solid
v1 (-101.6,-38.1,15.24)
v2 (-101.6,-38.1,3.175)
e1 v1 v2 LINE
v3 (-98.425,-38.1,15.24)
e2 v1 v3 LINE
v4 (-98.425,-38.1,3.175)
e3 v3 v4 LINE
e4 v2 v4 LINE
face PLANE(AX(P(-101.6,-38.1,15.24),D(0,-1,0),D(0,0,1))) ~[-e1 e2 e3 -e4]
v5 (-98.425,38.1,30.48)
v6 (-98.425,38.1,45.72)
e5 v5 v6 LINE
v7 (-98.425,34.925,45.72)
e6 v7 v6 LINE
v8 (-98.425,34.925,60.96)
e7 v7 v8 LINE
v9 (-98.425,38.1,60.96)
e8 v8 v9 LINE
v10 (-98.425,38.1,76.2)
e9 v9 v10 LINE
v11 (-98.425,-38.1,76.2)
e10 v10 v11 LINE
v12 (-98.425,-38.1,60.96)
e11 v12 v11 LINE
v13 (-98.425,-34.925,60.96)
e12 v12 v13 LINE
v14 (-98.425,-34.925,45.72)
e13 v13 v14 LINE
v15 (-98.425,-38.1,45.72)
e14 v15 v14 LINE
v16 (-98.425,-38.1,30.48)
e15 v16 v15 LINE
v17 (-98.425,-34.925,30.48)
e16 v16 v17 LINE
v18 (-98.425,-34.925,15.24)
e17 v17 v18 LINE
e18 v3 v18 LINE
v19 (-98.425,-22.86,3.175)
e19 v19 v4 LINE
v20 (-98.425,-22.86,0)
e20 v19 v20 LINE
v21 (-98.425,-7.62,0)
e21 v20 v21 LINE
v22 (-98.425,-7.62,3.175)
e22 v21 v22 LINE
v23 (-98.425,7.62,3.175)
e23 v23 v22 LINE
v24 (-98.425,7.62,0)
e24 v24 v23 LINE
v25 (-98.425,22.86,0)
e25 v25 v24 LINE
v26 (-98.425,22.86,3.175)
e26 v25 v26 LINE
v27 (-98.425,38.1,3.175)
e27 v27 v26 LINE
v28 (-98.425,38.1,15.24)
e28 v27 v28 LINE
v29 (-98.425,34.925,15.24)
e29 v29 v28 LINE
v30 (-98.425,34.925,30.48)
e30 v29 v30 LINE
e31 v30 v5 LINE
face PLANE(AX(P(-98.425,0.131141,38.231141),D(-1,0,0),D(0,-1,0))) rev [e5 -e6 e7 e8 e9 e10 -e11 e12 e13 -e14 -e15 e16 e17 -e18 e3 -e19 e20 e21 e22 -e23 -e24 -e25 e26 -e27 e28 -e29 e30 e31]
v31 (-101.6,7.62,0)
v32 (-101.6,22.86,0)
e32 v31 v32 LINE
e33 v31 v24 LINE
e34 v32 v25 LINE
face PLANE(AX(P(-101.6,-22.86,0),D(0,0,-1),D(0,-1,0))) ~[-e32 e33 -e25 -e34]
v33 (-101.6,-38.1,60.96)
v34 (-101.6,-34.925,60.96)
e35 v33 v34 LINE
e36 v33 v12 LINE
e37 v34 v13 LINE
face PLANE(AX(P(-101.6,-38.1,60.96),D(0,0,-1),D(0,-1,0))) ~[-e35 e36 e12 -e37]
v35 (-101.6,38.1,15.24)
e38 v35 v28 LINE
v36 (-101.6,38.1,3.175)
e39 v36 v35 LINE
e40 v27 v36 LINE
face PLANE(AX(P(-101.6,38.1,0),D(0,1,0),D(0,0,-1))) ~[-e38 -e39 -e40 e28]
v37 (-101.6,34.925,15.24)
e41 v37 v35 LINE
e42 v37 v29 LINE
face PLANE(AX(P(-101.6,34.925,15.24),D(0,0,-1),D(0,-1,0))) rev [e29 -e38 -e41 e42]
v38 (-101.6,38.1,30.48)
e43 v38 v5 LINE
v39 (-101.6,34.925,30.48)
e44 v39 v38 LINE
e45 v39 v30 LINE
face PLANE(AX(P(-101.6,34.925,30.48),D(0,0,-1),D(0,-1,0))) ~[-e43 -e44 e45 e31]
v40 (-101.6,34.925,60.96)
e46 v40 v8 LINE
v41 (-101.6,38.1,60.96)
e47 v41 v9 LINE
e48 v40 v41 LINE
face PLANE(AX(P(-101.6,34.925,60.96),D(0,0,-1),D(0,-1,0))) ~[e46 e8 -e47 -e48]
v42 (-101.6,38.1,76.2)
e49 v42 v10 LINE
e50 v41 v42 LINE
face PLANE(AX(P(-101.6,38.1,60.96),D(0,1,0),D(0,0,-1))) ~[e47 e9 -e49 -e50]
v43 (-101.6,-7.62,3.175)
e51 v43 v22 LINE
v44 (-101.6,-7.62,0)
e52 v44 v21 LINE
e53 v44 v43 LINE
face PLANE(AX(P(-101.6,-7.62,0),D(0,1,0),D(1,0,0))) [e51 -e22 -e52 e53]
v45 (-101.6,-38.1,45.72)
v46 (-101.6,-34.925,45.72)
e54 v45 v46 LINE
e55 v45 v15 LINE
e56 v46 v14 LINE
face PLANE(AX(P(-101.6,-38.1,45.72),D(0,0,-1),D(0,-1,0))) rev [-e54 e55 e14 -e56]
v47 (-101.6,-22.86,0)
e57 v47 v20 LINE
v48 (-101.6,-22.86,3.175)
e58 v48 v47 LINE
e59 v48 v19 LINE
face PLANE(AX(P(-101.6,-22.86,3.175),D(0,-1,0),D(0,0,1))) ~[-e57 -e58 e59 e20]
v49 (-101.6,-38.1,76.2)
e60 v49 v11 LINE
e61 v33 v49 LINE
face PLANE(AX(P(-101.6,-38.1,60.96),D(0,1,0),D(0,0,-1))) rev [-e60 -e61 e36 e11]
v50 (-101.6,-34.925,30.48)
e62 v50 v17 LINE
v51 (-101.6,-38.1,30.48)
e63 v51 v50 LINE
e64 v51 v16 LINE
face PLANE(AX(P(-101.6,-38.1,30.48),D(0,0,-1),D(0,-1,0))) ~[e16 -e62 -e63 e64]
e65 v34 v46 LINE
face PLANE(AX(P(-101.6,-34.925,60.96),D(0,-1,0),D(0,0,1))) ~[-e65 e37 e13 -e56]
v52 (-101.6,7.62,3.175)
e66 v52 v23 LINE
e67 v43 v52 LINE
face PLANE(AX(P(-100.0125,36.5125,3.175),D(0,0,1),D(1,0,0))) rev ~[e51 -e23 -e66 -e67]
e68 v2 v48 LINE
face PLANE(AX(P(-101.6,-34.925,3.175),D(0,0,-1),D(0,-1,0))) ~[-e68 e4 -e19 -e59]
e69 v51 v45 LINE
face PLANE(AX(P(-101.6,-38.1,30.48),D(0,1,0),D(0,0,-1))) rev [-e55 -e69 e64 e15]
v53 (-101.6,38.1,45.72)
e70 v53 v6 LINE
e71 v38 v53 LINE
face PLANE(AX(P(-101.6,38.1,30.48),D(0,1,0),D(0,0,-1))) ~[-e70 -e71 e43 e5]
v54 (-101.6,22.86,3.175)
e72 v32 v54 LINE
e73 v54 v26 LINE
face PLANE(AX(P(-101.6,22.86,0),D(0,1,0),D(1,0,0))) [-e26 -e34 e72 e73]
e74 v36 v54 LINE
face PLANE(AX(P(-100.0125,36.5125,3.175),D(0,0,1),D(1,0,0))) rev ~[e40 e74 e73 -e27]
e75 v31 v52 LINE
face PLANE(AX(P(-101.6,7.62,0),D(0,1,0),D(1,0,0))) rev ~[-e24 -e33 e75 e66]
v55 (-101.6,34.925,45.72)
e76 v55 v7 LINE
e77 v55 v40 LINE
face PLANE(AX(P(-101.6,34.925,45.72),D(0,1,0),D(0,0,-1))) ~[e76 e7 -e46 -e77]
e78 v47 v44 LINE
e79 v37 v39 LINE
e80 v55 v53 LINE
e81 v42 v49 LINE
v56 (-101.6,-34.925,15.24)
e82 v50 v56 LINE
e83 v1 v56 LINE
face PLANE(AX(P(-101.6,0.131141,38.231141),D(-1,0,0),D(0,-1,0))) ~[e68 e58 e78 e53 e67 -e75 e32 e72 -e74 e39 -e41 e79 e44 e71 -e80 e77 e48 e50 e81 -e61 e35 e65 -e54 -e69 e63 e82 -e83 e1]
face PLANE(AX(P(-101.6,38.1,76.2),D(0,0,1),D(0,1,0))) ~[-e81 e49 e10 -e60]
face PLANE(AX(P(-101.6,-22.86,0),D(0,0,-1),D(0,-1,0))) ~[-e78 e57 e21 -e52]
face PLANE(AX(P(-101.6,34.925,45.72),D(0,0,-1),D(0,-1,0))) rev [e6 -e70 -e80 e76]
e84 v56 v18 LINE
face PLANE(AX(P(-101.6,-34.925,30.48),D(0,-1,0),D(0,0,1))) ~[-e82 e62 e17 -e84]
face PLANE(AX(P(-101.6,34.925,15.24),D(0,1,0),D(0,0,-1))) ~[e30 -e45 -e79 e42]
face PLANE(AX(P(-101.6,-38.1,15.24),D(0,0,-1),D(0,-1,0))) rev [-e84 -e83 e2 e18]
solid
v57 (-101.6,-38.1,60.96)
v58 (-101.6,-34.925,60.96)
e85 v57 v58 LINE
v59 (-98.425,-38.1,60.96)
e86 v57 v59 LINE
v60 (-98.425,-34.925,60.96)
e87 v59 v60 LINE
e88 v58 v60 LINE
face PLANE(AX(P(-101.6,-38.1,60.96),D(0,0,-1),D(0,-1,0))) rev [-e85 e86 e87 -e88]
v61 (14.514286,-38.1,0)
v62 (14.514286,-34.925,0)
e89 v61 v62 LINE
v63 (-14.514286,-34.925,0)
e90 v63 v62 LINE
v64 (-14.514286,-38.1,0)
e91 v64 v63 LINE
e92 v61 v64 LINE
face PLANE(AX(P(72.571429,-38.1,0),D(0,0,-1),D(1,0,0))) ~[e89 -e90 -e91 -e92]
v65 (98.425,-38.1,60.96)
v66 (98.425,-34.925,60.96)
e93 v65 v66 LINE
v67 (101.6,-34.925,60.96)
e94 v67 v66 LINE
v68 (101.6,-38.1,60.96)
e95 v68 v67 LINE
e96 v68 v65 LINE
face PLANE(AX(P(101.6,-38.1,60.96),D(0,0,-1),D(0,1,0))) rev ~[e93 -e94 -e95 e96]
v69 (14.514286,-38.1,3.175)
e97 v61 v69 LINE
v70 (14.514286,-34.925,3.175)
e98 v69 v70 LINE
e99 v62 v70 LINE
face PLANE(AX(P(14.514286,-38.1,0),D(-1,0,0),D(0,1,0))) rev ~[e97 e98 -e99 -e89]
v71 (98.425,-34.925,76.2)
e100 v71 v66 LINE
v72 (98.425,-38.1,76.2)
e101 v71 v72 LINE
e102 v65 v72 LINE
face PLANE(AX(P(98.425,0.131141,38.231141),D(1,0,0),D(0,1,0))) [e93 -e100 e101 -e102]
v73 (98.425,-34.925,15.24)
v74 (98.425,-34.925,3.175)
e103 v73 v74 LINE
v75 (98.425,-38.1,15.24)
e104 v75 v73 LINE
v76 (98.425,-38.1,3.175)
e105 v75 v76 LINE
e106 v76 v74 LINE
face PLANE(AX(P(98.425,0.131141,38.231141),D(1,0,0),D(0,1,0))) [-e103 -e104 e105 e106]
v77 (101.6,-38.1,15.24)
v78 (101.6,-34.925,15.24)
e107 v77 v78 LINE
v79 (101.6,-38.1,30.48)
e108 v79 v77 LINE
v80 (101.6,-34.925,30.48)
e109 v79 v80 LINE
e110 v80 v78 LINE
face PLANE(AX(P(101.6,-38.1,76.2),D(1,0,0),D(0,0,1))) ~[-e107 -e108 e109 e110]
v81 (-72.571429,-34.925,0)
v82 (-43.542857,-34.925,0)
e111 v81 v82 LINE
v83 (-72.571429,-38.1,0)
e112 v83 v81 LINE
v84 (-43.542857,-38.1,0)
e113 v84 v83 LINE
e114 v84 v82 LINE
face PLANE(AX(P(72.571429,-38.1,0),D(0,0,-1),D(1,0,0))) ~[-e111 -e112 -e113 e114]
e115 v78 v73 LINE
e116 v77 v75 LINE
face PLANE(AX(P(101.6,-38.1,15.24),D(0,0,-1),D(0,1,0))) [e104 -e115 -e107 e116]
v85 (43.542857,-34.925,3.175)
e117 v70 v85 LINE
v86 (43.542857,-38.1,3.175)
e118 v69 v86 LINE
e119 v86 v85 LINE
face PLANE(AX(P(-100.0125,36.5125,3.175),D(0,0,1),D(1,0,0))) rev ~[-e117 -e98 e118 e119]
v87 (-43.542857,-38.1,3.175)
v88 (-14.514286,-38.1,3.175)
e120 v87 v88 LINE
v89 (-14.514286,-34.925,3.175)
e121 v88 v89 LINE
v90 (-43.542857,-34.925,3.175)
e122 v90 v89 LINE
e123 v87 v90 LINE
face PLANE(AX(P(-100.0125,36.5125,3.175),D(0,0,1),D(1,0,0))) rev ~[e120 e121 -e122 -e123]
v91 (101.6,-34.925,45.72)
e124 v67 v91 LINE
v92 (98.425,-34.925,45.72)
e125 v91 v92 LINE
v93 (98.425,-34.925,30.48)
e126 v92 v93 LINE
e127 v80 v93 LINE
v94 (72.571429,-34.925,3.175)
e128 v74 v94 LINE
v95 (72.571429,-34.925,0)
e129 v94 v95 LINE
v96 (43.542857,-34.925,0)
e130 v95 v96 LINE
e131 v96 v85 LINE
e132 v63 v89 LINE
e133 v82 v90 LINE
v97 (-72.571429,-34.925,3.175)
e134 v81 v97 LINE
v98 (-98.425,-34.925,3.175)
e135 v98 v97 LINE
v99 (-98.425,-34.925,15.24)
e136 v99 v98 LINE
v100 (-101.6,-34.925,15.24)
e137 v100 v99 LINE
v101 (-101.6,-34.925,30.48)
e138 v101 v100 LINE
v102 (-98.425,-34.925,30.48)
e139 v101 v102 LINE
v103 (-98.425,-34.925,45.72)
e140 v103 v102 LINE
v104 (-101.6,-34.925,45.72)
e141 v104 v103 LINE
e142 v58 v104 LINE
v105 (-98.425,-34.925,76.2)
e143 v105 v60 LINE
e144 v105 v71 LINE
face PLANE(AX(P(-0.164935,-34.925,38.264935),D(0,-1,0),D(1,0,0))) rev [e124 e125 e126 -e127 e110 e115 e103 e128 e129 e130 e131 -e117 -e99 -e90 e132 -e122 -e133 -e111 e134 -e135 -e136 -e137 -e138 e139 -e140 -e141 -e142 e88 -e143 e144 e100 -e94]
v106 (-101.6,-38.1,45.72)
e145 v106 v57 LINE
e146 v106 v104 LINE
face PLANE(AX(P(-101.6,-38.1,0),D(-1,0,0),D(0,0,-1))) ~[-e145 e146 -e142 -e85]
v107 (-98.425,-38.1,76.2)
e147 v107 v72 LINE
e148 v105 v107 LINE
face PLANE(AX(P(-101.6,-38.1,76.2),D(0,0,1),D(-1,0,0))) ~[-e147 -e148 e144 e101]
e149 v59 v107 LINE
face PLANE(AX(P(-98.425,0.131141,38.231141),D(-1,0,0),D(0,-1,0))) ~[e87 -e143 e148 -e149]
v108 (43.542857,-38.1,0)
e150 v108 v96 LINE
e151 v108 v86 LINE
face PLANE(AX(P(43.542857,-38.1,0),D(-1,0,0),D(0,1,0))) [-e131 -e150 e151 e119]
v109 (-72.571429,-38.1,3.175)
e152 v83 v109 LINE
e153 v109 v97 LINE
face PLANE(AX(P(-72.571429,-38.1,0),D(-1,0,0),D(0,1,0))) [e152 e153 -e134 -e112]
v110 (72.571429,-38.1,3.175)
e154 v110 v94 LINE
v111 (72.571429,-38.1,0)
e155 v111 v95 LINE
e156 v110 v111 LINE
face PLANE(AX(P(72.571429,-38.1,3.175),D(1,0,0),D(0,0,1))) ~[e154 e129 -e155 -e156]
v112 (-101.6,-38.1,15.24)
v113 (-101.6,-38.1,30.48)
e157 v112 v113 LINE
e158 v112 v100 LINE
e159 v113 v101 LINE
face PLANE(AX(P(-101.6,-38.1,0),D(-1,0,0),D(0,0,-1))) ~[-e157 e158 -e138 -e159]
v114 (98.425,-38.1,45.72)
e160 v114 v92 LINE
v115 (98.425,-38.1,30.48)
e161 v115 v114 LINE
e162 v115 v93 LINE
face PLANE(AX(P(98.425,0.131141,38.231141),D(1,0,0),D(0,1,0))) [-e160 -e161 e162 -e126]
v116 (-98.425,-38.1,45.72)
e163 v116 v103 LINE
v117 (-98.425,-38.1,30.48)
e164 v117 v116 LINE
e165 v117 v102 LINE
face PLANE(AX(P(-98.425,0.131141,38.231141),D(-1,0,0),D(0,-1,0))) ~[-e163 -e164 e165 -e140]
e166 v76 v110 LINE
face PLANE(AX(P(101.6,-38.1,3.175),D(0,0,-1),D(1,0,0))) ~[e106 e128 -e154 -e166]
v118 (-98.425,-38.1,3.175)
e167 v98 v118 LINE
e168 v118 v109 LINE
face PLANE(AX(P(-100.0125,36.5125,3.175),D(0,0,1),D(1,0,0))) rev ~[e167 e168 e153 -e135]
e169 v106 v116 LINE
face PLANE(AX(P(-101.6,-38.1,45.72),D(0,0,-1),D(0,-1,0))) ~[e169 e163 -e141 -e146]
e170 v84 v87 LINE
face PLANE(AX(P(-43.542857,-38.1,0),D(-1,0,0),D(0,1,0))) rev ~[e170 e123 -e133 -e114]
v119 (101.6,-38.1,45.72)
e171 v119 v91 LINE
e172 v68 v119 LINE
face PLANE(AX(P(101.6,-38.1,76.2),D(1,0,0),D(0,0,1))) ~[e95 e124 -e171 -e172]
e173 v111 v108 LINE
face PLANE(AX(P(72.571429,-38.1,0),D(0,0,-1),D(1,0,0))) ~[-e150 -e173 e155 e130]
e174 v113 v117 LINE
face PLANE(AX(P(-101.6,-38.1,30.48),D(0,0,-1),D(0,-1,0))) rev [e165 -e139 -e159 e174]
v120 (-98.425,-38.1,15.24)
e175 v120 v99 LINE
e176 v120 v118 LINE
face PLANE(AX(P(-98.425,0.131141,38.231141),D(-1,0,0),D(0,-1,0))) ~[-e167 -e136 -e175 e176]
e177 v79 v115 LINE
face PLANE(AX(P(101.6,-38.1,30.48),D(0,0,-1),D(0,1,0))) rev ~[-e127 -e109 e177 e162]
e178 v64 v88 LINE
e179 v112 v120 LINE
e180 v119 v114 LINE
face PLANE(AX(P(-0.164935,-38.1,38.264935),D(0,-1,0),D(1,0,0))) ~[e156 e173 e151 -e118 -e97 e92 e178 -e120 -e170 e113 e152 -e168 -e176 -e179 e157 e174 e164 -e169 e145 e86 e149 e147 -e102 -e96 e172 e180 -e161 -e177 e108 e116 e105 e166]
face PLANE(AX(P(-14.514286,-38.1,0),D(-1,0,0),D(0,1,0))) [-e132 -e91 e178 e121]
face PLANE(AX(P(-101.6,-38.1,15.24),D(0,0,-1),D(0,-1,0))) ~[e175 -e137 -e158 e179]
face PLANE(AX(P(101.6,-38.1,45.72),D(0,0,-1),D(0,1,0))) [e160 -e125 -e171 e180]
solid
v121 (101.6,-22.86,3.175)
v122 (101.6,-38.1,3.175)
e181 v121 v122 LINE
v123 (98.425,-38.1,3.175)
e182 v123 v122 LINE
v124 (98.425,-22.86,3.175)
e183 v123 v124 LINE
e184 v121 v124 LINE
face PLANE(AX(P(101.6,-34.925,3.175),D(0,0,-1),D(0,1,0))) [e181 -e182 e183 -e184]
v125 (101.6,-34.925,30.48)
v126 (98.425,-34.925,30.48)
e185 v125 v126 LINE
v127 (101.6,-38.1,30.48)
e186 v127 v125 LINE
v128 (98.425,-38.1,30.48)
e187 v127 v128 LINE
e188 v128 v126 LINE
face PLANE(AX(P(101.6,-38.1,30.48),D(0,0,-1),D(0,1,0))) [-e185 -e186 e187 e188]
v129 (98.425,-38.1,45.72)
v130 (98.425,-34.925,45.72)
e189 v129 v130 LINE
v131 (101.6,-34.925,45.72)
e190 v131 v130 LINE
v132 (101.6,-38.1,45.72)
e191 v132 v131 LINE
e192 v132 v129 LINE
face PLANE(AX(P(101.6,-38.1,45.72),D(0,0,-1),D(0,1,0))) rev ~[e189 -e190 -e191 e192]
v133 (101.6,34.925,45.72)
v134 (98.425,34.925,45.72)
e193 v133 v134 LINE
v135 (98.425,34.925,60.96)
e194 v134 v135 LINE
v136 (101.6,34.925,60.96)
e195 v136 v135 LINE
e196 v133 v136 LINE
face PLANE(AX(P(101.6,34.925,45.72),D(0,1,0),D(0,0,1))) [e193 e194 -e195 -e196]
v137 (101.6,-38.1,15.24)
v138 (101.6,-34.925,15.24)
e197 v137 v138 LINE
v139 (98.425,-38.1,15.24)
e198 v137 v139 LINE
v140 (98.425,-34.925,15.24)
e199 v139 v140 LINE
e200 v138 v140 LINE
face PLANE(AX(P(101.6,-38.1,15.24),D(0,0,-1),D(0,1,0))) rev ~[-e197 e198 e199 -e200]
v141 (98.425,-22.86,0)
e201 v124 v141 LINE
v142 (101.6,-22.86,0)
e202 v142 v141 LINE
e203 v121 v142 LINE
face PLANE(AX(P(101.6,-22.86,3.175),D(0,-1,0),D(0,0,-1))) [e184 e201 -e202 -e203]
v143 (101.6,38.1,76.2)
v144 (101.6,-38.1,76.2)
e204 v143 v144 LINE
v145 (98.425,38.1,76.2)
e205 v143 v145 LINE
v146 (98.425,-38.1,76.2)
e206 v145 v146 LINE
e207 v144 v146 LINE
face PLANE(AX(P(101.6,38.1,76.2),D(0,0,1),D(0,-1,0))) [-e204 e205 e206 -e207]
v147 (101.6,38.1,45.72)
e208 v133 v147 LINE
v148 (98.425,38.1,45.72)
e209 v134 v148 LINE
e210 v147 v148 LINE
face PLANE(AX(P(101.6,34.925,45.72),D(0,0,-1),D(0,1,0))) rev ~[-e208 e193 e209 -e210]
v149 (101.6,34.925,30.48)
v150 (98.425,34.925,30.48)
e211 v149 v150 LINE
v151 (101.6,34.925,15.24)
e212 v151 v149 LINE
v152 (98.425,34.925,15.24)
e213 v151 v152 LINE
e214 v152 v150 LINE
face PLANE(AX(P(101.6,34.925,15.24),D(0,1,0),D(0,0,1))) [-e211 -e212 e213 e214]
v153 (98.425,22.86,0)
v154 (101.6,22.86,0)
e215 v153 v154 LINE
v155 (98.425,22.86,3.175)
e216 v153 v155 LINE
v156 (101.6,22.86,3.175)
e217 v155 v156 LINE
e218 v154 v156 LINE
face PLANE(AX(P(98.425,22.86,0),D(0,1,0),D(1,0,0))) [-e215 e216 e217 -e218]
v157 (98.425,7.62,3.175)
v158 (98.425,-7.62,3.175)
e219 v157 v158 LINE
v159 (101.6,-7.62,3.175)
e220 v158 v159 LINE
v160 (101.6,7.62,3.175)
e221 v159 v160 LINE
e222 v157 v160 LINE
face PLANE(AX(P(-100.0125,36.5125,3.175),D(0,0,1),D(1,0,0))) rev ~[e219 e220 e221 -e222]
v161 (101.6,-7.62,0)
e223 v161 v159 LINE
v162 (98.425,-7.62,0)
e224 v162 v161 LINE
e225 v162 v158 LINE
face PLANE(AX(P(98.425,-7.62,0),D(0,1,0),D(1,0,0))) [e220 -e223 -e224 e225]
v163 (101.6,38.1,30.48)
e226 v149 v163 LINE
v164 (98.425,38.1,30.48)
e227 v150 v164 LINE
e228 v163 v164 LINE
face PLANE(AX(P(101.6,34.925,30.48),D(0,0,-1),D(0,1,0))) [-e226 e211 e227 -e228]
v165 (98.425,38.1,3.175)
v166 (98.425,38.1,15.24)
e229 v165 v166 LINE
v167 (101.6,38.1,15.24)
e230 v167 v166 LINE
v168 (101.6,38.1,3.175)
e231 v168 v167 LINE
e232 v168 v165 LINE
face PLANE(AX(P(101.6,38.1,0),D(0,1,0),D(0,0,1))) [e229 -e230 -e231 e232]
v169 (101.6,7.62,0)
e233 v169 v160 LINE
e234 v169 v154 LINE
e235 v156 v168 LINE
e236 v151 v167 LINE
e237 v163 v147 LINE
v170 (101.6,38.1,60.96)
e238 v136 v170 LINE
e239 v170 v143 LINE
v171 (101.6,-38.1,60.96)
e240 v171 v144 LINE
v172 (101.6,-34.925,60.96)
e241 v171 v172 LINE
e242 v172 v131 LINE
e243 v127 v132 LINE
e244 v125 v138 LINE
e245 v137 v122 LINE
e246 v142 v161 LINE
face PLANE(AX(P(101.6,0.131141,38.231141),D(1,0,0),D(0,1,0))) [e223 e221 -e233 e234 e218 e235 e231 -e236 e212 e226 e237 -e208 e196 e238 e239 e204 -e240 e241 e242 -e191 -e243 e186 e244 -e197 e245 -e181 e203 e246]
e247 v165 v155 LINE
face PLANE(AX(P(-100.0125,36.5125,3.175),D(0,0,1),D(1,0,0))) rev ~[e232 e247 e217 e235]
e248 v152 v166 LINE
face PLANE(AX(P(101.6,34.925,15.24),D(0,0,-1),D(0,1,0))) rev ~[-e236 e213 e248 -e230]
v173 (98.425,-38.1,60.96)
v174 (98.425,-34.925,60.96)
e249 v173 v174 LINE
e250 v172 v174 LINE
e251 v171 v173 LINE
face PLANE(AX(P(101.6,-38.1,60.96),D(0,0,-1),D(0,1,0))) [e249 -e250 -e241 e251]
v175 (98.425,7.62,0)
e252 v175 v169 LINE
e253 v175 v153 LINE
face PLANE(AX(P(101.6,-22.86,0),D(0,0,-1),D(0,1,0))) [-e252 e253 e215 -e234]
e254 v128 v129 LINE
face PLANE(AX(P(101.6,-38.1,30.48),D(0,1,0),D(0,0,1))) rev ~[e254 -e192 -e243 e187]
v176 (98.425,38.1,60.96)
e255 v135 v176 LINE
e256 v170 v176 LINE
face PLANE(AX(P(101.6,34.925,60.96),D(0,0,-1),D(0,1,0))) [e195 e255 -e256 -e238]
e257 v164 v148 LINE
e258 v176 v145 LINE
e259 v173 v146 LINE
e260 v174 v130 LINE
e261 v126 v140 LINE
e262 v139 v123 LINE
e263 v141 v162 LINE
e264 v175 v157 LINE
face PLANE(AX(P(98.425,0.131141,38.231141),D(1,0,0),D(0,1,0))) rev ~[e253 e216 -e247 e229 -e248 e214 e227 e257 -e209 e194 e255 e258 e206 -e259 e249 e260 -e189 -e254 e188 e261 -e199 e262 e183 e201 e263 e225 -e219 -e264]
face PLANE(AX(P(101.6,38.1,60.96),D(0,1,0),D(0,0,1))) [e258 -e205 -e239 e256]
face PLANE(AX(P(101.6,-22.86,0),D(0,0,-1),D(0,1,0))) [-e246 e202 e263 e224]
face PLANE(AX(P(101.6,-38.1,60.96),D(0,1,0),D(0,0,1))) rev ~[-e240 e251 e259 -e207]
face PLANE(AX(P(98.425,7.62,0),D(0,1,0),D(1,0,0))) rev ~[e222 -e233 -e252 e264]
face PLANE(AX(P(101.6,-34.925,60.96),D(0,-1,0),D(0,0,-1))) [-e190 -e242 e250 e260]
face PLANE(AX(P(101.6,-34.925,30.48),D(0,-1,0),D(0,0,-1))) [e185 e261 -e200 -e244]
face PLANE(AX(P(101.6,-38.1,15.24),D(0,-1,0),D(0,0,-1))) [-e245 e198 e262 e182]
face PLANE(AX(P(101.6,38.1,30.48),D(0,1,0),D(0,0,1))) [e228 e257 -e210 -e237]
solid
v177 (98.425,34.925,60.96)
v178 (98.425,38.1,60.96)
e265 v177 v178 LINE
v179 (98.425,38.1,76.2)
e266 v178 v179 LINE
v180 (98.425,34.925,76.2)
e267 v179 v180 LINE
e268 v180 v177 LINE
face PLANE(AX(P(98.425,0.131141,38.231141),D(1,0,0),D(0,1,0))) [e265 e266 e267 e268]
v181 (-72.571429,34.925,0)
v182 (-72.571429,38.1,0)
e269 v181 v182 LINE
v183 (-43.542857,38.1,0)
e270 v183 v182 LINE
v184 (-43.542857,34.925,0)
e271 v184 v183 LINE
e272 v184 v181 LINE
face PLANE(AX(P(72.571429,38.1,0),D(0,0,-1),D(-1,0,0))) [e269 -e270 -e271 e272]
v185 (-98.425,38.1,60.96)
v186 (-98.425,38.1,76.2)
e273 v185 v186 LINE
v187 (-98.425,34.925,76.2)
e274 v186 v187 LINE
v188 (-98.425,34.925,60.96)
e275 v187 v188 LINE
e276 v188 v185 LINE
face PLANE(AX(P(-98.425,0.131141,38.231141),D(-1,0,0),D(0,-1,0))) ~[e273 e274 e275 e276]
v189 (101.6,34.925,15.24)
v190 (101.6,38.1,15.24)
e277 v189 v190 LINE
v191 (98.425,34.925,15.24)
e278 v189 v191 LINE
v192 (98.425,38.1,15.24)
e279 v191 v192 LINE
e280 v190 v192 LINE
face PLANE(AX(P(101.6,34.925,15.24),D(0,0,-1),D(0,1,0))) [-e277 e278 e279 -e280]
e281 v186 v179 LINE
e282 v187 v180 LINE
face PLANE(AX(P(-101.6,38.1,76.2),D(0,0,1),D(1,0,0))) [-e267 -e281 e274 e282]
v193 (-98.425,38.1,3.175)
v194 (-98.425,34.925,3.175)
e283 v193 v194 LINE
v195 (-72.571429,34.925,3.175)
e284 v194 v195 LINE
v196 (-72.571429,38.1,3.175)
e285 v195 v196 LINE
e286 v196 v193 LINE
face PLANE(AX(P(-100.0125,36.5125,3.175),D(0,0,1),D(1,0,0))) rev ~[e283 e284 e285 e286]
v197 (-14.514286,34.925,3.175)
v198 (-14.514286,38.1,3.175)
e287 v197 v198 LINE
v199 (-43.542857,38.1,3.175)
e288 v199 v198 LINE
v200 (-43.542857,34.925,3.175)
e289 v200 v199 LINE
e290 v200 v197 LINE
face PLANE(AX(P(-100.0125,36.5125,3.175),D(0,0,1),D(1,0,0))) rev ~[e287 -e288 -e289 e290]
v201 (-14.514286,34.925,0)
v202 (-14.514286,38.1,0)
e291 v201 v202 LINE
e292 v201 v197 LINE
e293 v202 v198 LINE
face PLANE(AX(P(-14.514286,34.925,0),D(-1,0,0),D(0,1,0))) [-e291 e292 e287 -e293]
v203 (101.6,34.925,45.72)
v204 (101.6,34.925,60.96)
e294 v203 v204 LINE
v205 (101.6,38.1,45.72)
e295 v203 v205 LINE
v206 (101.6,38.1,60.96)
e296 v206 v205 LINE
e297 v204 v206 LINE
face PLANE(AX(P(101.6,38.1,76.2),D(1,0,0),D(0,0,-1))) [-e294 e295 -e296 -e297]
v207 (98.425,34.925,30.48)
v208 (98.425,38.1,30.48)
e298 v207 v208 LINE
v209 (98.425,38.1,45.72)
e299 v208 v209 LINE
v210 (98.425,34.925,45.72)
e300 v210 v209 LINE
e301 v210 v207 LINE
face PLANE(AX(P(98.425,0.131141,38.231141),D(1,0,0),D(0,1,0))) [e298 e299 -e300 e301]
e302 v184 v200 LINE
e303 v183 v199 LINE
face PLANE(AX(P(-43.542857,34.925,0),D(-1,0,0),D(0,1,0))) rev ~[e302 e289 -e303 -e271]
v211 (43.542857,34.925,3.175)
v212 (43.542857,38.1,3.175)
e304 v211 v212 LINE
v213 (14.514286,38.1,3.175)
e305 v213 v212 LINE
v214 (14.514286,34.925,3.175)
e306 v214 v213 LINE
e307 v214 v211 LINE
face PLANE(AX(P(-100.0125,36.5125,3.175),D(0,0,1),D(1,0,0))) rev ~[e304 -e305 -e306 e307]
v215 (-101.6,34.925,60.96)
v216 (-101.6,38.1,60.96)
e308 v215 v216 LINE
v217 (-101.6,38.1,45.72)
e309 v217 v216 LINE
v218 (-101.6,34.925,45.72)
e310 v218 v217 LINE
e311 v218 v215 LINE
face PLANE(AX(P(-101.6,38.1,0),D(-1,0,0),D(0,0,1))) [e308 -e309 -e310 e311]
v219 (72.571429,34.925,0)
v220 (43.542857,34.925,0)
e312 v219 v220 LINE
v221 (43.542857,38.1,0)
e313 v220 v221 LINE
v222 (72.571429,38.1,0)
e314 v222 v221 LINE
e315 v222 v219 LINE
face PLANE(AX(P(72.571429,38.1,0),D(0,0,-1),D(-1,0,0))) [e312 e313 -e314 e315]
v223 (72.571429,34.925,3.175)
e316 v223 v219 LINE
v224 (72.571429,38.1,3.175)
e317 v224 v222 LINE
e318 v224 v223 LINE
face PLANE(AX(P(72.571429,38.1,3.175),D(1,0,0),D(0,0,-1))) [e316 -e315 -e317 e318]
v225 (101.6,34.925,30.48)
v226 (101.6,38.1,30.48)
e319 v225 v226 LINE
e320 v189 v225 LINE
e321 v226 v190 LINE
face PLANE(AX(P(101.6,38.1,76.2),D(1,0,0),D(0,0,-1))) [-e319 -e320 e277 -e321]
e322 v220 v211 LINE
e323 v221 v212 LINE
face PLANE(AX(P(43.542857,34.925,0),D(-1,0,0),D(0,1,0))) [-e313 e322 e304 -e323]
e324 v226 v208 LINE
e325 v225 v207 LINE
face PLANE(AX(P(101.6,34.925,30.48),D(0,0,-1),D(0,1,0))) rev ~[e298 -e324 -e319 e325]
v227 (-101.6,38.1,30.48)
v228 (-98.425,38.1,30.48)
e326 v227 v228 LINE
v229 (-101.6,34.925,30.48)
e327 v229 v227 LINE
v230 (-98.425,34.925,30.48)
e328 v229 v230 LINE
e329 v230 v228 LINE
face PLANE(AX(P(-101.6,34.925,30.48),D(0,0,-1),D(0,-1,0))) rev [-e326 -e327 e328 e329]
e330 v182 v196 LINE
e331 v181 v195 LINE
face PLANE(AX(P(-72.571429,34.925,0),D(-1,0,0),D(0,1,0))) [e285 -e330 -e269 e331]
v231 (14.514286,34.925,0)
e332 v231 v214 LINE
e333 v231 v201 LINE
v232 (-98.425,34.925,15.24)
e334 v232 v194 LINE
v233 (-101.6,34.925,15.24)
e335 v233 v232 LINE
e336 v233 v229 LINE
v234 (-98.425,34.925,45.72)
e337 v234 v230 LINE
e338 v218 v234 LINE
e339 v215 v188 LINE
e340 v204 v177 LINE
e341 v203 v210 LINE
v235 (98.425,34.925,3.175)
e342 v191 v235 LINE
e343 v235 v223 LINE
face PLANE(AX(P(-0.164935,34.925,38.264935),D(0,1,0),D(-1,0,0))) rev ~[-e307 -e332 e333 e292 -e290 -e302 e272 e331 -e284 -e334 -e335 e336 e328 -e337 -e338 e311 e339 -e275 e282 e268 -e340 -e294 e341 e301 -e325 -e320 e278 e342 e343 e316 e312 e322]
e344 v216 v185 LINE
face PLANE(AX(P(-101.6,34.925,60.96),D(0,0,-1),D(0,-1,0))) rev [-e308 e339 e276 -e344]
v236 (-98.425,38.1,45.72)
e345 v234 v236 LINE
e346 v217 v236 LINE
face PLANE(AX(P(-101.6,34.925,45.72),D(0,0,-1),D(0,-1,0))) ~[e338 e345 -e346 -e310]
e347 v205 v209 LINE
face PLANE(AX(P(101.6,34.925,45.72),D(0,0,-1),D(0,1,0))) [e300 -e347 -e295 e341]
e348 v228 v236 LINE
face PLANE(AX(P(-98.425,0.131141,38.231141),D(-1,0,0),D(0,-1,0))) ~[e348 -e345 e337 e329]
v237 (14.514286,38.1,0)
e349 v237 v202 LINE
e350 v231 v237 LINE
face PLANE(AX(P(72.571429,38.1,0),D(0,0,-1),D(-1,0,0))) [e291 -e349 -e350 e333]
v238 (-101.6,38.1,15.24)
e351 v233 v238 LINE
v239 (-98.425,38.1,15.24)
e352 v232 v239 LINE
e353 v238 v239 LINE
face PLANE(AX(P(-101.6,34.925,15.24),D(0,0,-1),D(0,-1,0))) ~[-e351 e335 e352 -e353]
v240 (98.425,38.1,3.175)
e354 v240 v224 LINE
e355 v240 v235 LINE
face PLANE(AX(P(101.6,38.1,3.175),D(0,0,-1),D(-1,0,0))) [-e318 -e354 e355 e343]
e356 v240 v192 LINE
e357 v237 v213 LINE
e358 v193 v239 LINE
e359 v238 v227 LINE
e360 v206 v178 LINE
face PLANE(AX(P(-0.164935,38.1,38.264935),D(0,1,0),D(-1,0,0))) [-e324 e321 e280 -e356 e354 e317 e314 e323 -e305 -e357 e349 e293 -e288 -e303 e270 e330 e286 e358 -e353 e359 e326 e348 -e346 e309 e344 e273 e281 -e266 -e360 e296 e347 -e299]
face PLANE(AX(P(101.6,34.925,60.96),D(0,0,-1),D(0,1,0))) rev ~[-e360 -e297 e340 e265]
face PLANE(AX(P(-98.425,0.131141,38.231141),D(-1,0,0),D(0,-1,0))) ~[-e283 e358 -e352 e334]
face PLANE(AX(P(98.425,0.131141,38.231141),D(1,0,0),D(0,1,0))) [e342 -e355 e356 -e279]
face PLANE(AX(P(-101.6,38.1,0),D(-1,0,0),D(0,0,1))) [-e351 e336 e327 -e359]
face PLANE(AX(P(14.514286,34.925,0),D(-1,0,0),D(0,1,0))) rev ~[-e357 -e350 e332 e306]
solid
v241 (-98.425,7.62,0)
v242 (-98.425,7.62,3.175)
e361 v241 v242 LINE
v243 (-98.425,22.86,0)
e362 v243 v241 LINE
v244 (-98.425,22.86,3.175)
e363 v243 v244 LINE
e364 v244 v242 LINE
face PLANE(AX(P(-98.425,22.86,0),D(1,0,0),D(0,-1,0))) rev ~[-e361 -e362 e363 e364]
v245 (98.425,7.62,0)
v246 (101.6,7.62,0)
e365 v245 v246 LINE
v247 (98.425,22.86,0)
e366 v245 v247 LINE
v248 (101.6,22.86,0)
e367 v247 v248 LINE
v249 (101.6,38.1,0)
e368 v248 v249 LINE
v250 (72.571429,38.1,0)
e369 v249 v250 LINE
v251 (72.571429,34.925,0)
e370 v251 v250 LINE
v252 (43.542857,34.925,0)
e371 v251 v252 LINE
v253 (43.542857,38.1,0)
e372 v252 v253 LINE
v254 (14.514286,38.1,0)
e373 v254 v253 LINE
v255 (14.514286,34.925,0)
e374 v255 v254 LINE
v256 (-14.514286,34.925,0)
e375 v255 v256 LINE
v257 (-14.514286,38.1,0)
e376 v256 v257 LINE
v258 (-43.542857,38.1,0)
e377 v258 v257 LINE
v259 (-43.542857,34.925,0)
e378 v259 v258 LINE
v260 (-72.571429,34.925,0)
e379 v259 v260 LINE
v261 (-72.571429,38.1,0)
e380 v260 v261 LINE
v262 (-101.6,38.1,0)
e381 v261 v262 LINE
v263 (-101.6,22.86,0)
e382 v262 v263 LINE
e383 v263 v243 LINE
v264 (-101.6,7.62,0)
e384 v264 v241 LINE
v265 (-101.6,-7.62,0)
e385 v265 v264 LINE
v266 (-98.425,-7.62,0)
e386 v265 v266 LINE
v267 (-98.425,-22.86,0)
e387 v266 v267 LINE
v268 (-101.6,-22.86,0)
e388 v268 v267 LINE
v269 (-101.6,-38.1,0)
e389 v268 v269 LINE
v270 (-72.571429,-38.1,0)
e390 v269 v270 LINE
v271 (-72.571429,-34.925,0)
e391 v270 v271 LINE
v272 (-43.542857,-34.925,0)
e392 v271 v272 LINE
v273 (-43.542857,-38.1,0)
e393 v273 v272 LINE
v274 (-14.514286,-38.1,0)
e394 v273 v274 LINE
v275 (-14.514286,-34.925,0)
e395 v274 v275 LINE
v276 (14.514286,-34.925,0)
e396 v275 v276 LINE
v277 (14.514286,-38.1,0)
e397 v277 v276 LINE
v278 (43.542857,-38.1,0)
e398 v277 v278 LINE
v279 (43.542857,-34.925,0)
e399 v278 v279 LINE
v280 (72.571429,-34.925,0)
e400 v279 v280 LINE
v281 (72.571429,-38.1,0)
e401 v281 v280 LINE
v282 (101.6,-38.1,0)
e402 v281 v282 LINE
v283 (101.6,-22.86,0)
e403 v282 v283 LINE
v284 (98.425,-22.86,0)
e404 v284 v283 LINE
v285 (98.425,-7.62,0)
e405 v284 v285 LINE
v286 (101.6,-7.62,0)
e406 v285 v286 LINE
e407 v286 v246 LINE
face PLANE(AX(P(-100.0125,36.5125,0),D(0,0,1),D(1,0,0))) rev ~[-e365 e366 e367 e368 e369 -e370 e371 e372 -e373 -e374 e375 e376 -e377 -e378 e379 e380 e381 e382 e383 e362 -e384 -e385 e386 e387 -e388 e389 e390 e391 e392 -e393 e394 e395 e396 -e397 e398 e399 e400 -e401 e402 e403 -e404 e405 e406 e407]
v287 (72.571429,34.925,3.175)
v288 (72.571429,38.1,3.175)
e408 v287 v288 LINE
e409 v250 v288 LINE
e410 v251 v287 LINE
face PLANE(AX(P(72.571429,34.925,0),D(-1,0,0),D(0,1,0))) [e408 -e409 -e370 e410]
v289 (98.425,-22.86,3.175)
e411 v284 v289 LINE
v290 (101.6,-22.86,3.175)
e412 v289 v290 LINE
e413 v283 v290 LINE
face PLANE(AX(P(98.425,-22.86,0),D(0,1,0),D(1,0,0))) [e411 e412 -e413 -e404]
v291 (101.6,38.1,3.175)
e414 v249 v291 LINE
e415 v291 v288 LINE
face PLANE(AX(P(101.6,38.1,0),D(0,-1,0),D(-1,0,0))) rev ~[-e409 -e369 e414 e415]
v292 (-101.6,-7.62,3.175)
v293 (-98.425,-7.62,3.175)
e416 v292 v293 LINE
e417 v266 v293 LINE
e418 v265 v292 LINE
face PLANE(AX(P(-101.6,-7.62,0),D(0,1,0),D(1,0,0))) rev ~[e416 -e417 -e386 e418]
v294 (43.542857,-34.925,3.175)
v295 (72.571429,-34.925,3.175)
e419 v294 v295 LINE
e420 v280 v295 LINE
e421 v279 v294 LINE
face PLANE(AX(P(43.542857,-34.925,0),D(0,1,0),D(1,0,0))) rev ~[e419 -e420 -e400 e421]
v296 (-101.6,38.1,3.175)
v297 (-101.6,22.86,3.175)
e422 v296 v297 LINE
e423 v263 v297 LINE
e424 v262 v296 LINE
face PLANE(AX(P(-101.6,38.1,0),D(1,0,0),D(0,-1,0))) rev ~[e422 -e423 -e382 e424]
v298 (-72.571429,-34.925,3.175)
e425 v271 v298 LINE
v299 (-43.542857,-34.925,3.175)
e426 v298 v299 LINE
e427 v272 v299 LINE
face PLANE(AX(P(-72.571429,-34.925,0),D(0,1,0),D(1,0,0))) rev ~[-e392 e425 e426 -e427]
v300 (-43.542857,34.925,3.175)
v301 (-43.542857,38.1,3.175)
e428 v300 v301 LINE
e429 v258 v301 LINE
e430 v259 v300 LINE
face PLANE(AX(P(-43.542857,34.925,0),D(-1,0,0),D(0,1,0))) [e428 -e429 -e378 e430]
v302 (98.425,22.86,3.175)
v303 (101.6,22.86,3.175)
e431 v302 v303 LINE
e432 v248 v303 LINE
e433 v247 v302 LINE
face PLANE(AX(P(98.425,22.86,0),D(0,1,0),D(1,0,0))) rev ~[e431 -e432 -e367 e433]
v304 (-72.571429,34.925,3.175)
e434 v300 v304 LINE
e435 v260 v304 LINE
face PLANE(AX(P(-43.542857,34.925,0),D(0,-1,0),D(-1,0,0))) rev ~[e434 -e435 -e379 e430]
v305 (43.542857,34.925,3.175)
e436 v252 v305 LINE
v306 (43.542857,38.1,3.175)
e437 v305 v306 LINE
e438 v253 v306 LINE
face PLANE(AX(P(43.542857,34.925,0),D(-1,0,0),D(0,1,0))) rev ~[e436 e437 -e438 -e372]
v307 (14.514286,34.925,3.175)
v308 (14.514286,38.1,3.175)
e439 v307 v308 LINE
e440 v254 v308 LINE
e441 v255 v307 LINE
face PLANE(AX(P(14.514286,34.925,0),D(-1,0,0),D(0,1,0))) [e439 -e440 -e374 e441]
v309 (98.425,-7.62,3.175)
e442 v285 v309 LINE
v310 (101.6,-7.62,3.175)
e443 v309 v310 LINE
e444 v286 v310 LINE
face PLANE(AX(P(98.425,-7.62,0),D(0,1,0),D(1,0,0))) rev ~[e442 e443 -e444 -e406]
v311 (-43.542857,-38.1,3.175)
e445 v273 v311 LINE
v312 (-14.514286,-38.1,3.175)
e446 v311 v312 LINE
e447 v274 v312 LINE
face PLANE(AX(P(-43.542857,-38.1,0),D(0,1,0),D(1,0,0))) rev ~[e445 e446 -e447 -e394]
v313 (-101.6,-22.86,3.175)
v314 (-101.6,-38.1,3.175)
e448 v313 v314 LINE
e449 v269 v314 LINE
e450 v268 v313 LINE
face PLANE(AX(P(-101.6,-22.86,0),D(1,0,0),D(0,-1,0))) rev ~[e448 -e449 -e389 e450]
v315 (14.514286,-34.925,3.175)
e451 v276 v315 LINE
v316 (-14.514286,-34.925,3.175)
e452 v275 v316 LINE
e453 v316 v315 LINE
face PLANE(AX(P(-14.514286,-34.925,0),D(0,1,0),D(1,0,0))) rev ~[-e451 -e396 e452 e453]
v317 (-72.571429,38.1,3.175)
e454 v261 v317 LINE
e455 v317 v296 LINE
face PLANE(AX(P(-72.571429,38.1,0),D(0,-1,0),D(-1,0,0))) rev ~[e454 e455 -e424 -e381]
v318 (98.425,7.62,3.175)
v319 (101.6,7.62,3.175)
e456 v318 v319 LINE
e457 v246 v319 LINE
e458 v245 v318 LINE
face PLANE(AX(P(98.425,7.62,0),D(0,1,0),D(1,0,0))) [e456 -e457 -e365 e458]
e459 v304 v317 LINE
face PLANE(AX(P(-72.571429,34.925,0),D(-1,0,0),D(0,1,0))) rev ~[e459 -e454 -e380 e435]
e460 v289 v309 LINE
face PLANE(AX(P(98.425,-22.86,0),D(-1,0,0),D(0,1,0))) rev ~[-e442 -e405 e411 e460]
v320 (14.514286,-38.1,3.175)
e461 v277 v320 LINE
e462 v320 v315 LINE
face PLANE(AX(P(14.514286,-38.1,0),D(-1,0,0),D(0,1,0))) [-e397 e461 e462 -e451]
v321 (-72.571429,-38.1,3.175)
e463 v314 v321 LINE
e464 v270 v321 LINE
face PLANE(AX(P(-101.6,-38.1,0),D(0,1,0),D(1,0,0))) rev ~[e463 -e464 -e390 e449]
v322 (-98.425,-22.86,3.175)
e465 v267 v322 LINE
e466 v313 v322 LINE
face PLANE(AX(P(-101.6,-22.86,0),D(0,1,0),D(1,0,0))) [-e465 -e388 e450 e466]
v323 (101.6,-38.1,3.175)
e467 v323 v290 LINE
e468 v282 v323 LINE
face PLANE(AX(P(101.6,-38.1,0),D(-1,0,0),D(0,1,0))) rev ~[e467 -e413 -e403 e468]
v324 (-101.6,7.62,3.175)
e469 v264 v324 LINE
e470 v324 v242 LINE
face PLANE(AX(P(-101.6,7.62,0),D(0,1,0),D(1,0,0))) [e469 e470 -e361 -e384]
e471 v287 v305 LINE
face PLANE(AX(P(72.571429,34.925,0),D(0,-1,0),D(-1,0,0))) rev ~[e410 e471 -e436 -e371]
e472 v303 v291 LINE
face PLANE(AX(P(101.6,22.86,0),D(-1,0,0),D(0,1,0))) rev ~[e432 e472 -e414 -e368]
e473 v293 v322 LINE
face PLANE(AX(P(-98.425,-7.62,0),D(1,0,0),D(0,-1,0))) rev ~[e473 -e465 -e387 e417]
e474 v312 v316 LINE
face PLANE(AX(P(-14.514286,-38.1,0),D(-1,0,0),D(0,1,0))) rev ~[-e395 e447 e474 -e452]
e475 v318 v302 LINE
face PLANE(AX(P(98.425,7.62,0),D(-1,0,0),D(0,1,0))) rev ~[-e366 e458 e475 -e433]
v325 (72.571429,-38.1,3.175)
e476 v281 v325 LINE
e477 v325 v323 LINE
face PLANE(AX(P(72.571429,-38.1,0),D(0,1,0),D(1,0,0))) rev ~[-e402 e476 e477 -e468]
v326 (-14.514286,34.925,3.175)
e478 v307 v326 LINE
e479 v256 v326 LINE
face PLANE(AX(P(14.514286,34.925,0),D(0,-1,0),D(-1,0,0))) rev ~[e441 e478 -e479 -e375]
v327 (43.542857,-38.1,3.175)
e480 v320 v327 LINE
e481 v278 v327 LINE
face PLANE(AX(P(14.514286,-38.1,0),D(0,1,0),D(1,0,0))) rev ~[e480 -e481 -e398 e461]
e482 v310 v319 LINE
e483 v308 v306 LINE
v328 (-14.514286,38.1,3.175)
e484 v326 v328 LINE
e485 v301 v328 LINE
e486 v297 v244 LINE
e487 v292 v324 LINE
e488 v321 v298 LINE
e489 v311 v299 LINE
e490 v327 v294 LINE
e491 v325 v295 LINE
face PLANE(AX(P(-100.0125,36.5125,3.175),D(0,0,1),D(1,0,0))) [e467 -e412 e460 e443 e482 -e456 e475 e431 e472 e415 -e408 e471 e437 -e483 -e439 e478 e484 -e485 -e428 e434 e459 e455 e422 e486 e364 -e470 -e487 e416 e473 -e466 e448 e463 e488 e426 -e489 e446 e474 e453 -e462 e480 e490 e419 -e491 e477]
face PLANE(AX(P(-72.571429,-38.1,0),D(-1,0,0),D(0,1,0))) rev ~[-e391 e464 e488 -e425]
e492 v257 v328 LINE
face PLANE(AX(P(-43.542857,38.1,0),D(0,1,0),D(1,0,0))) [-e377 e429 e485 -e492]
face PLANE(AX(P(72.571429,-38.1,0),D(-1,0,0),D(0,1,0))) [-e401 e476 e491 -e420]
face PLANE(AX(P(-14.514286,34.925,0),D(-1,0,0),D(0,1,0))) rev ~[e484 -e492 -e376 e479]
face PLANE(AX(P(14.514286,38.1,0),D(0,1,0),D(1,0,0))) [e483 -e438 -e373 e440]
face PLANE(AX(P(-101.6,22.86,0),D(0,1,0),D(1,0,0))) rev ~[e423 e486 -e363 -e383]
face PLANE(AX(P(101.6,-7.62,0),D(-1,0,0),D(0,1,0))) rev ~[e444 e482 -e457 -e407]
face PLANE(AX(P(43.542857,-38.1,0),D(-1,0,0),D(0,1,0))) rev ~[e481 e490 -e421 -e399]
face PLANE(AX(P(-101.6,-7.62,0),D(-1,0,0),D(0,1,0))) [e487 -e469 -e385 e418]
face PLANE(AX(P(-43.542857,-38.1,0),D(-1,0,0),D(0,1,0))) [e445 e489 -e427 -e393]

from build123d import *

# Parameters (mm, degrees)
F0_W     = 3.175
F0_H     = 3.175
F0_H_2   = 12.065
F0_W_2   = 25.8535714286
F0_H_3   = 15.24
F0_W_3   = 29.0285714286
F1_DEPTH = 3.175
F2_W     = 3.175
F2_H     = 15.24
F2_H_2   = 12.065
F2_H_3   = 3.175
F3_DEPTH = 3.175
F7_DEPTH = 3.175


with BuildPart() as f1:
    # F0 (on Top) → F1 (new body)
    with BuildSketch(Plane.XY):
        with Locations((-100.0125, 36.5125)):
            Rectangle(F0_W, F0_H)
        with Locations((-100.0125, 28.8925)):
            Rectangle(F0_W, F0_H_2)
        with Locations((-85.4982142857, 36.5125)):
            Rectangle(F0_W_2, F0_H)
        Polygon((98.425, 22.86), (98.425, 34.925), (72.5714285714, 34.925), (43.5428571429, 34.925), (14.5142857143, 34.925), (-14.5142857143, 34.925), (-43.5428571429, 34.925), (-72.5714285714, 34.925), (-98.425, 34.925), (-98.425, 22.86), (-98.425, 7.62), (-98.425, -7.62), (-98.425, -22.86), (-98.425, -34.925), (-72.5714285714, -34.925), (-43.5428571429, -34.925), (-14.5142857143, -34.925), (14.5142857143, -34.925), (43.5428571429, -34.925), (72.5714285714, -34.925), (98.425, -34.925), (98.425, -22.86), (98.425, -7.62), (98.425, 7.62), align=None)
        with Locations((-100.0125, 0)):
            Rectangle(F0_W, F0_H_3)
        with Locations((-100.0125, -28.8925)):
            Rectangle(F0_W, F0_H_2)
        with Locations((-100.0125, -36.5125)):
            Rectangle(F0_W, F0_H)
        with Locations((-85.4982142857, -36.5125)):
            Rectangle(F0_W_2, F0_H)
        with Locations((-29.0285714286, -36.5125)):
            Rectangle(F0_W_3, F0_H)
        with Locations((29.0285714286, -36.5125)):
            Rectangle(F0_W_3, F0_H)
        with Locations((85.4982142857, -36.5125)):
            Rectangle(F0_W_2, F0_H)
        with Locations((100.0125, -36.5125)):
            Rectangle(F0_W, F0_H)
        with Locations((100.0125, -28.8925)):
            Rectangle(F0_W, F0_H_2)
        with Locations((100.0125, 0)):
            Rectangle(F0_W, F0_H_3)
        with Locations((100.0125, 28.8925)):
            Rectangle(F0_W, F0_H_2)
        with Locations((100.0125, 36.5125)):
            Rectangle(F0_W, F0_H)
        with Locations((85.4982142857, 36.5125)):
            Rectangle(F0_W_2, F0_H)
        with Locations((29.0285714286, 36.5125)):
            Rectangle(F0_W_3, F0_H)
        with Locations((-29.0285714286, 36.5125)):
            Rectangle(F0_W_3, F0_H)
    extrude(amount=F1_DEPTH)


with BuildPart() as f3:
    # F2 (on face) → F3 (new body)
    with BuildSketch(Plane.YZ.offset(101.6)):
        Polygon((-22.86, 3.175), (-22.86, 0), (34.925, 0), (34.925, 15.24), (34.925, 30.48), (34.925, 45.72), (34.925, 60.96), (34.925, 76.2), (-34.925, 76.2), (-34.925, 60.96), (-34.925, 45.72), (-34.925, 30.48), (-34.925, 15.24), (-34.925, 3.175), align=None)
        with Locations((-36.5125, 68.58)):
            Rectangle(F2_W, F2_H)
        with Locations((-36.5125, 38.1)):
            Rectangle(F2_W, F2_H)
        with Locations((-36.5125, 9.2075)):
            Rectangle(F2_W, F2_H_2)
        with Locations((-36.5125, 1.5875)):
            Rectangle(F2_W, F2_H_3)
        with Locations((36.5125, 7.62)):
            Rectangle(F2_W, F2_H)
        with Locations((36.5125, 38.1)):
            Rectangle(F2_W, F2_H)
        with Locations((36.5125, 68.58)):
            Rectangle(F2_W, F2_H)
    extrude(amount=-F3_DEPTH)


with BuildPart() as f4_1:
    # F4: instance of F3
    add(f3.part.mirror(Plane.YZ))

    # F5: cut F1
    add(f1.part, mode=Mode.SUBTRACT)


with BuildPart() as f3_1:
    add(f3.part)

    # F5: cut F1
    add(f1.part, mode=Mode.SUBTRACT)


with BuildPart() as f7:
    # F6 (on face) → F7 (new body)
    with BuildSketch(Plane(origin=(0, 38.1, 0), x_dir=(-1, 0, 0), z_dir=(0, 1, 0))):
        Polygon((-72.5714285714, 3.175), (-72.5714285714, 0), (101.6, 0), (101.6, 76.2), (-101.6, 76.2), (-101.6, 3.175), align=None)
    extrude(amount=-F7_DEPTH)


with BuildPart() as f8_1:
    # F8: instance of F7
    add(f7.part.mirror(Plane.XZ))

    # F9: cut F4_1, F1, F3
    add(f4_1.part, mode=Mode.SUBTRACT)
    add(f1.part, mode=Mode.SUBTRACT)
    add(f3_1.part, mode=Mode.SUBTRACT)


with BuildPart() as f7_1:
    add(f7.part)

    # F9: cut F4_1, F1, F3
    add(f4_1.part, mode=Mode.SUBTRACT)
    add(f1.part, mode=Mode.SUBTRACT)
    add(f3_1.part, mode=Mode.SUBTRACT)


solid = Compound([f1.part, f4_1.part, f3_1.part, f8_1.part, f7_1.part])
